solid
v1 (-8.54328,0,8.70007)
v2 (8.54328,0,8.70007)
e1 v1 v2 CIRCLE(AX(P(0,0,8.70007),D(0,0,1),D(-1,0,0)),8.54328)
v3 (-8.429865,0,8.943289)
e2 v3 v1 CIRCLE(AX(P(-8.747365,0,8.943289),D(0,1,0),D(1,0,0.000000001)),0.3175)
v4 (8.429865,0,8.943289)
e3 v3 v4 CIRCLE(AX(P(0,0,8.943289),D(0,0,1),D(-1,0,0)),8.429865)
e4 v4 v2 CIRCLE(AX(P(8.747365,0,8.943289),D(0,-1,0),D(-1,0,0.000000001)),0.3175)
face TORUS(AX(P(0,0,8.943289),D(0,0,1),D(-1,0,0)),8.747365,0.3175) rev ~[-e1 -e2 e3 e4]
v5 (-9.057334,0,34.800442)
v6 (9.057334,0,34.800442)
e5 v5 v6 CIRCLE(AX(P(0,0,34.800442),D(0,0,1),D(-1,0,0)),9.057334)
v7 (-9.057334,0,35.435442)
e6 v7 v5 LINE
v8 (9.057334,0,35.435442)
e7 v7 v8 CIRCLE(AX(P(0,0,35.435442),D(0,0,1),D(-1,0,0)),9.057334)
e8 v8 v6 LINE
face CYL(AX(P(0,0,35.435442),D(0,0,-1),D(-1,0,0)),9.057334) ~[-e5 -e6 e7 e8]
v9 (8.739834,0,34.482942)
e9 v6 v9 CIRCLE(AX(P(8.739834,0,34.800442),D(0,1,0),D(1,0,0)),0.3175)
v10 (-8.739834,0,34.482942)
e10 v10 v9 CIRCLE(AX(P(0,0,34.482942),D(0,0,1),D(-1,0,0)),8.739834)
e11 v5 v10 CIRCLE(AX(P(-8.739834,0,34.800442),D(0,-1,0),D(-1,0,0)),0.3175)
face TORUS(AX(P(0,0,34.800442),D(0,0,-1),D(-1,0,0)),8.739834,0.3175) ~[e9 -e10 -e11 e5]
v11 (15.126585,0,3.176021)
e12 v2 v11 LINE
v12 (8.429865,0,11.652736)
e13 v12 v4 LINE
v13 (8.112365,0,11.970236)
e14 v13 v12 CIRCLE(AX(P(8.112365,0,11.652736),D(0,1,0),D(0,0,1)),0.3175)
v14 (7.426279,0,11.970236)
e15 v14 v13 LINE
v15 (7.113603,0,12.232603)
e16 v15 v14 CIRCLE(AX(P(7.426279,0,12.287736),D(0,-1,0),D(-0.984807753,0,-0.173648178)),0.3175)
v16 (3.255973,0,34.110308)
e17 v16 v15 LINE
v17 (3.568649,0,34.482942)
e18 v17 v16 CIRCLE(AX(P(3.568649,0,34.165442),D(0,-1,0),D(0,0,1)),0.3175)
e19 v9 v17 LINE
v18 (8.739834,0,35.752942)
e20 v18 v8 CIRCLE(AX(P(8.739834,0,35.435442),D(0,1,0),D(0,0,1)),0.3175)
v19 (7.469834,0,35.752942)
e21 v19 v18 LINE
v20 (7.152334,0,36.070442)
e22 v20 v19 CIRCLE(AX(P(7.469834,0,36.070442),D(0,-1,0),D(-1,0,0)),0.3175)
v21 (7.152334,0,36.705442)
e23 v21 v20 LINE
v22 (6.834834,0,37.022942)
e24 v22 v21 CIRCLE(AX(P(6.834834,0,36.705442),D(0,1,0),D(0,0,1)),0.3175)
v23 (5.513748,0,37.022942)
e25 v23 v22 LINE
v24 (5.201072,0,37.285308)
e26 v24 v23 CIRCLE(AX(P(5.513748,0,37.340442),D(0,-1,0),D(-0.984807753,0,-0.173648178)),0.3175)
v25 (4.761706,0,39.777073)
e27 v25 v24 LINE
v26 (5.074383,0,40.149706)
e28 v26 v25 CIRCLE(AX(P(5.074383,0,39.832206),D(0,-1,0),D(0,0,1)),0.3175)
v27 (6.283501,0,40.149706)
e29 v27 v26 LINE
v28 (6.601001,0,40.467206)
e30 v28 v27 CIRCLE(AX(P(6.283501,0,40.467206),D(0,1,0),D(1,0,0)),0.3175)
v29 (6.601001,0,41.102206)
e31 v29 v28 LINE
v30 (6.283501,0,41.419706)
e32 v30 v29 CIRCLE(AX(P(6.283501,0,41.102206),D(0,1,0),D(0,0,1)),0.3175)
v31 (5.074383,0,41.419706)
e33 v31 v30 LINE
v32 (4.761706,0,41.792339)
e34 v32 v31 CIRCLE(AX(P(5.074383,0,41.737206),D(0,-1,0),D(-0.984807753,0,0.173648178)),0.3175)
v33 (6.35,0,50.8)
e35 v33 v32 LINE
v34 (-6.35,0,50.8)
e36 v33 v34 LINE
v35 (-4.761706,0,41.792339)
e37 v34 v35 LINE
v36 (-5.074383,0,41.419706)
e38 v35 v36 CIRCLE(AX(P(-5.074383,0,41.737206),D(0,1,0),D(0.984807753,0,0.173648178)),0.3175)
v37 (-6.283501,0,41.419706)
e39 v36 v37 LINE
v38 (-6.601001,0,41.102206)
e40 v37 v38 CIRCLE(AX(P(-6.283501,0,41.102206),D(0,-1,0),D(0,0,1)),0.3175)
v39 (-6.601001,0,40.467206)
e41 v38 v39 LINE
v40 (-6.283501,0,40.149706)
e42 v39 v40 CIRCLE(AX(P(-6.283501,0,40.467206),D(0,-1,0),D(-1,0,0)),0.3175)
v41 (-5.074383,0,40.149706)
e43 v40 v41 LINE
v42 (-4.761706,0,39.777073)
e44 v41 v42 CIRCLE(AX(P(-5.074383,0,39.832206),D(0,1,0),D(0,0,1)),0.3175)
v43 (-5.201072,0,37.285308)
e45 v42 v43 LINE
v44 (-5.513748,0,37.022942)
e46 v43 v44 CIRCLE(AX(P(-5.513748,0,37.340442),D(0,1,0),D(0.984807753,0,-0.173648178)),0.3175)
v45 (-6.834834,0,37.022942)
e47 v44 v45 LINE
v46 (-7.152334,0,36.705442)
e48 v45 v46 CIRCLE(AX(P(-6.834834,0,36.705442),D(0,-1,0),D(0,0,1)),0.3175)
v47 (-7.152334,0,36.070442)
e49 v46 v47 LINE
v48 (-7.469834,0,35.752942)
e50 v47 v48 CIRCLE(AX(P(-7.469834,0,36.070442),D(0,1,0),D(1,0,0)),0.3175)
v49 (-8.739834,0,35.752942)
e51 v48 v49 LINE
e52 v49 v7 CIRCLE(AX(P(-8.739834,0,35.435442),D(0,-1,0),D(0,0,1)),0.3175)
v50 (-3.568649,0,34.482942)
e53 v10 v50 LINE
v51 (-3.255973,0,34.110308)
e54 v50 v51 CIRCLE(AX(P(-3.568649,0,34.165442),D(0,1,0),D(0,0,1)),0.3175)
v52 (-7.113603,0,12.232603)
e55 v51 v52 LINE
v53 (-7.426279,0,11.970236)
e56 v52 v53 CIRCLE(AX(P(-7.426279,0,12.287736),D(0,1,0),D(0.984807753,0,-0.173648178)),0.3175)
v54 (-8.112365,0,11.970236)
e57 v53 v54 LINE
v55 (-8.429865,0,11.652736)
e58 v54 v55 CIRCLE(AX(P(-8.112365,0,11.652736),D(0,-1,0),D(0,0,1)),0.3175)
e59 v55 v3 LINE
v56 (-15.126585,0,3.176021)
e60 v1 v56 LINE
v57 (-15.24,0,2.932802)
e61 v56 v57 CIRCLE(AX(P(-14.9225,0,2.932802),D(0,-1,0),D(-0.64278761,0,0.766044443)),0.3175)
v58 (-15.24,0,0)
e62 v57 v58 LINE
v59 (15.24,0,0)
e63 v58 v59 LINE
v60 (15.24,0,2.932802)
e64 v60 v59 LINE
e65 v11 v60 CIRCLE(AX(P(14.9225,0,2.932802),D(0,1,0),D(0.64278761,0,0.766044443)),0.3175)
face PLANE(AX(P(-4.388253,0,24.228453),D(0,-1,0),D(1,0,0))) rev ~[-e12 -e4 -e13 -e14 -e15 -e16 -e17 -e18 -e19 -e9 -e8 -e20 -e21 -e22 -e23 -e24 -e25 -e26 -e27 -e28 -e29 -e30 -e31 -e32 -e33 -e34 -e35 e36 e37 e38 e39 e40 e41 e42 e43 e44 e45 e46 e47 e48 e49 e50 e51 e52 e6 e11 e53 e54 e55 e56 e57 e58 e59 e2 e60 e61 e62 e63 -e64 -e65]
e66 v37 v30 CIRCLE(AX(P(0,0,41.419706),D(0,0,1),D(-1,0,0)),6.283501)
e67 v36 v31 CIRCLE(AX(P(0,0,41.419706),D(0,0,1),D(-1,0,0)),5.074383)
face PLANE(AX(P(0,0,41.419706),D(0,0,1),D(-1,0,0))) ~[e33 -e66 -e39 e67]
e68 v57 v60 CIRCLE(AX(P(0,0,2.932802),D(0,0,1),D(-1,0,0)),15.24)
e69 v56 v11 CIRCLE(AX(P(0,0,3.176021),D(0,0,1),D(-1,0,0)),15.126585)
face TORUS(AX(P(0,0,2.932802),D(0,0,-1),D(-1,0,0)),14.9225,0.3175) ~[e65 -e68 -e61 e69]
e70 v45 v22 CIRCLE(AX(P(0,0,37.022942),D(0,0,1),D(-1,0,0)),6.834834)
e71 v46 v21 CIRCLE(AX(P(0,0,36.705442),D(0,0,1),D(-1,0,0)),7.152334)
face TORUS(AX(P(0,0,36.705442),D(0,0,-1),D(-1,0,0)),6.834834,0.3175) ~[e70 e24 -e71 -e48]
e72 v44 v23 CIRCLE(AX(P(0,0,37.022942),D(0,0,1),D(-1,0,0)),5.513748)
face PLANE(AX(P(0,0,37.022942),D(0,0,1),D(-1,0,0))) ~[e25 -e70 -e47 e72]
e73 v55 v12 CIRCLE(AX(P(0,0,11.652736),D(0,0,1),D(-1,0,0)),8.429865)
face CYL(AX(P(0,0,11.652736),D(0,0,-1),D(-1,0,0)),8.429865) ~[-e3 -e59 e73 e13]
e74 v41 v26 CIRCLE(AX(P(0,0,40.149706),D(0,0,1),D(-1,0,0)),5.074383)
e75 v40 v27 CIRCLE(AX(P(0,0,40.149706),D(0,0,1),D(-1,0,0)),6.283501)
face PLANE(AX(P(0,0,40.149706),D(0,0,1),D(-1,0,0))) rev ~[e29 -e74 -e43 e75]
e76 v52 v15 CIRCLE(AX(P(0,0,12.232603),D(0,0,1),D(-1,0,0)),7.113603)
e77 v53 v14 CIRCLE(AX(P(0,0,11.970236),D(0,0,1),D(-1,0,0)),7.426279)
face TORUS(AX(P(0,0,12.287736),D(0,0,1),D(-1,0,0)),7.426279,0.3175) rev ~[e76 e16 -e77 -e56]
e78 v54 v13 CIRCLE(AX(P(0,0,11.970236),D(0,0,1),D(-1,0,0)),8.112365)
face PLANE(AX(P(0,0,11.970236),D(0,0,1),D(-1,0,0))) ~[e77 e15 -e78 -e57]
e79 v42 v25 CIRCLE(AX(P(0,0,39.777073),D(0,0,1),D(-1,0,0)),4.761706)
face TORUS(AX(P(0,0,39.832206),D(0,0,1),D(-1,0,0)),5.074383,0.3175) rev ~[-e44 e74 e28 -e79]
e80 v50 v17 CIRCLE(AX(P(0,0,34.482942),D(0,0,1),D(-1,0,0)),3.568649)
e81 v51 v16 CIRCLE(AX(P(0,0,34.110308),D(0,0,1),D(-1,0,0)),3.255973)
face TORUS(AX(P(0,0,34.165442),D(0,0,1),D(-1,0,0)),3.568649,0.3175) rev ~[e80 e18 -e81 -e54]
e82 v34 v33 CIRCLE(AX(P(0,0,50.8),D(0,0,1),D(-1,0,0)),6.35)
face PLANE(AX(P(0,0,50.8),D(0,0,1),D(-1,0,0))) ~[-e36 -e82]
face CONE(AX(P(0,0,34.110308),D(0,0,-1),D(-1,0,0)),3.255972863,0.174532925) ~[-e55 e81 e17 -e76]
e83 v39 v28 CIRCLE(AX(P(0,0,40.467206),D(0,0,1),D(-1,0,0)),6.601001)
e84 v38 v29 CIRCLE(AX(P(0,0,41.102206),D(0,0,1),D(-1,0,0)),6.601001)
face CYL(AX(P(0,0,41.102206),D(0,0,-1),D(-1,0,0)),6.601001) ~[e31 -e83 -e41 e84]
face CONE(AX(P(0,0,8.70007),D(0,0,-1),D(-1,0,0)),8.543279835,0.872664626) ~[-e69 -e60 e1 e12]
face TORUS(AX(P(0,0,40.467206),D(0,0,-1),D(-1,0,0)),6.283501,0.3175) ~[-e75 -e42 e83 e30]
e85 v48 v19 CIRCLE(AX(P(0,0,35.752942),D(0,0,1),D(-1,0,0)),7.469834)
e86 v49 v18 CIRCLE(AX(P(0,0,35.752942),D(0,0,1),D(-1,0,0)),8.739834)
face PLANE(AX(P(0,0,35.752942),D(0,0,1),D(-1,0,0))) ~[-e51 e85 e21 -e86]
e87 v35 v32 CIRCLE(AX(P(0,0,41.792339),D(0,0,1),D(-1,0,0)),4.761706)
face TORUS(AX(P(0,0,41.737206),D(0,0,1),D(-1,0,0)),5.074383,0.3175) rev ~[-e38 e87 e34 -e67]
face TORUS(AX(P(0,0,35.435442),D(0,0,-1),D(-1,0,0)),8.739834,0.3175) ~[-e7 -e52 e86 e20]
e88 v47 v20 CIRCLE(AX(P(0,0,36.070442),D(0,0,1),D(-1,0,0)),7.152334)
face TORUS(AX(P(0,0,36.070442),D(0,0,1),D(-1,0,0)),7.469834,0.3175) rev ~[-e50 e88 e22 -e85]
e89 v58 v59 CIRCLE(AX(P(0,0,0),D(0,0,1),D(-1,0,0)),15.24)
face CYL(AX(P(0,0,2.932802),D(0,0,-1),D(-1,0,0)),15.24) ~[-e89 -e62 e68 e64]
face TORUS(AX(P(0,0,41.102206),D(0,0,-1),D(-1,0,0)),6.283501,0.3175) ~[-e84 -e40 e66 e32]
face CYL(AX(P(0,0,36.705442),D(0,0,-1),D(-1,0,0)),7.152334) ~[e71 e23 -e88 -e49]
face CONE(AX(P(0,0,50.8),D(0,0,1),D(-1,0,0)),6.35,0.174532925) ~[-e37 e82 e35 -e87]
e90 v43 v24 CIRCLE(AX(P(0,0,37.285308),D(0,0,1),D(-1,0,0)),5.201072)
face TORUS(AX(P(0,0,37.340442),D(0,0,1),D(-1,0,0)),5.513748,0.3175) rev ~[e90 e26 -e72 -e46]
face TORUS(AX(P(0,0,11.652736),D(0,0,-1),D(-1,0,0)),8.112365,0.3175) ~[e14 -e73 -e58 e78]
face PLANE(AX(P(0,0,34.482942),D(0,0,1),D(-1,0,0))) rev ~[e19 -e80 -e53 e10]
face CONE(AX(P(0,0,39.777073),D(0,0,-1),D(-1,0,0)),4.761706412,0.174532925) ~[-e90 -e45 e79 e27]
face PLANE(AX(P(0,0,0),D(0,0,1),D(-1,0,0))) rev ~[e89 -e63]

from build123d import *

# Parameters (mm, degrees)
F1_ANGLE = 180


# Not quite as in the source:
# - a feature of the source that left no trace in its solid (it failed there, or was rolled back) is left out


with BuildPart() as f1:
    # F0 (on Front) → F1 (revolve)
    with BuildSketch(Plane.XZ):
        with BuildLine():
            Line((-15.24, 0), (0, 0))
            Line((0, 0), (0, 50.8))
            Line((0, 50.8), (-6.35, 50.8))
            Line((-6.35, 50.8), (-4.7617064118, 41.792339449))
            ThreePointArc((-4.7617064118, 41.792339449), (-4.8311637627, 41.5331210865), (-5.0743828734, 41.4197061526))
            Line((-5.0743828734, 41.4197061526), (-6.2835011077, 41.4197061526))
            ThreePointArc((-6.2835011077, 41.4197061526), (-6.5080075107, 41.3267125556), (-6.6010011077, 41.1022061526))
            Line((-6.6010011077, 41.1022061526), (-6.6010011077, 40.4672061526))
            ThreePointArc((-6.6010011077, 40.4672061526), (-6.5080075107, 40.2426997495), (-6.2835011077, 40.1497061526))
            Line((-6.2835011077, 40.1497061526), (-5.0743828734, 40.1497061526))
            ThreePointArc((-5.0743828734, 40.1497061526), (-4.8311637627, 40.0362912186), (-4.7617064118, 39.7770728561))
            Line((-4.7617064118, 39.7770728561), (-5.2010717431, 37.2853082403))
            ThreePointArc((-5.2010717431, 37.2853082403), (-5.3096631386, 37.0972224261), (-5.5137482047, 37.0229415367))
            Line((-5.5137482047, 37.0229415367), (-6.8348340718, 37.0229415367))
            ThreePointArc((-6.8348340718, 37.0229415367), (-7.0593404748, 36.9299479398), (-7.1523340718, 36.7054415367))
            Line((-7.1523340718, 36.7054415367), (-7.1523340718, 36.0704415367))
            ThreePointArc((-7.1523340718, 36.0704415367), (-7.2453276688, 35.8459351337), (-7.4698340718, 35.7529415367))
            Line((-7.4698340718, 35.7529415367), (-8.7398340718, 35.7529415367))
            ThreePointArc((-8.7398340718, 35.7529415367), (-8.9643404748, 35.6599479398), (-9.0573340718, 35.4354415367))
            Line((-9.0573340718, 35.4354415367), (-9.0573340718, 34.8004415367))
            ThreePointArc((-9.0573340718, 34.8004415367), (-8.9643404748, 34.5759351337), (-8.7398340718, 34.4829415367))
            Line((-8.7398340718, 34.4829415367), (-3.5686493249, 34.4829415367))
            ThreePointArc((-3.5686493249, 34.4829415367), (-3.3254302142, 34.3695266028), (-3.2559728633, 34.1103082403))
            Line((-3.2559728633, 34.1103082403), (-7.113602572, 12.2326030065))
            ThreePointArc((-7.113602572, 12.2326030065), (-7.2221939675, 12.0445171922), (-7.4262790336, 11.9702363029))
            Line((-7.4262790336, 11.9702363029), (-8.1123649007, 11.9702363029))
            ThreePointArc((-8.1123649007, 11.9702363029), (-8.3368713037, 11.8772427059), (-8.4298649007, 11.6527363029))
            Line((-8.4298649007, 11.6527363029), (-8.4298649007, 8.9432889844))
            ThreePointArc((-8.4298649007, 8.9432889844), (-8.4596121783, 8.8091076862), (-8.5432798346, 8.7000698737))
            Line((-8.5432798346, 8.7000698737), (-15.1265850661, 3.176020882))
            ThreePointArc((-15.1265850661, 3.176020882), (-15.2102527224, 3.0669830694), (-15.24, 2.9328017713))
            Line((-15.24, 2.9328017713), (-15.24, 0))
        make_face()
    revolve(axis=Axis((0, 0, 25.4), (0, 0, 1)), revolution_arc=F1_ANGLE)


solid = f1.part
